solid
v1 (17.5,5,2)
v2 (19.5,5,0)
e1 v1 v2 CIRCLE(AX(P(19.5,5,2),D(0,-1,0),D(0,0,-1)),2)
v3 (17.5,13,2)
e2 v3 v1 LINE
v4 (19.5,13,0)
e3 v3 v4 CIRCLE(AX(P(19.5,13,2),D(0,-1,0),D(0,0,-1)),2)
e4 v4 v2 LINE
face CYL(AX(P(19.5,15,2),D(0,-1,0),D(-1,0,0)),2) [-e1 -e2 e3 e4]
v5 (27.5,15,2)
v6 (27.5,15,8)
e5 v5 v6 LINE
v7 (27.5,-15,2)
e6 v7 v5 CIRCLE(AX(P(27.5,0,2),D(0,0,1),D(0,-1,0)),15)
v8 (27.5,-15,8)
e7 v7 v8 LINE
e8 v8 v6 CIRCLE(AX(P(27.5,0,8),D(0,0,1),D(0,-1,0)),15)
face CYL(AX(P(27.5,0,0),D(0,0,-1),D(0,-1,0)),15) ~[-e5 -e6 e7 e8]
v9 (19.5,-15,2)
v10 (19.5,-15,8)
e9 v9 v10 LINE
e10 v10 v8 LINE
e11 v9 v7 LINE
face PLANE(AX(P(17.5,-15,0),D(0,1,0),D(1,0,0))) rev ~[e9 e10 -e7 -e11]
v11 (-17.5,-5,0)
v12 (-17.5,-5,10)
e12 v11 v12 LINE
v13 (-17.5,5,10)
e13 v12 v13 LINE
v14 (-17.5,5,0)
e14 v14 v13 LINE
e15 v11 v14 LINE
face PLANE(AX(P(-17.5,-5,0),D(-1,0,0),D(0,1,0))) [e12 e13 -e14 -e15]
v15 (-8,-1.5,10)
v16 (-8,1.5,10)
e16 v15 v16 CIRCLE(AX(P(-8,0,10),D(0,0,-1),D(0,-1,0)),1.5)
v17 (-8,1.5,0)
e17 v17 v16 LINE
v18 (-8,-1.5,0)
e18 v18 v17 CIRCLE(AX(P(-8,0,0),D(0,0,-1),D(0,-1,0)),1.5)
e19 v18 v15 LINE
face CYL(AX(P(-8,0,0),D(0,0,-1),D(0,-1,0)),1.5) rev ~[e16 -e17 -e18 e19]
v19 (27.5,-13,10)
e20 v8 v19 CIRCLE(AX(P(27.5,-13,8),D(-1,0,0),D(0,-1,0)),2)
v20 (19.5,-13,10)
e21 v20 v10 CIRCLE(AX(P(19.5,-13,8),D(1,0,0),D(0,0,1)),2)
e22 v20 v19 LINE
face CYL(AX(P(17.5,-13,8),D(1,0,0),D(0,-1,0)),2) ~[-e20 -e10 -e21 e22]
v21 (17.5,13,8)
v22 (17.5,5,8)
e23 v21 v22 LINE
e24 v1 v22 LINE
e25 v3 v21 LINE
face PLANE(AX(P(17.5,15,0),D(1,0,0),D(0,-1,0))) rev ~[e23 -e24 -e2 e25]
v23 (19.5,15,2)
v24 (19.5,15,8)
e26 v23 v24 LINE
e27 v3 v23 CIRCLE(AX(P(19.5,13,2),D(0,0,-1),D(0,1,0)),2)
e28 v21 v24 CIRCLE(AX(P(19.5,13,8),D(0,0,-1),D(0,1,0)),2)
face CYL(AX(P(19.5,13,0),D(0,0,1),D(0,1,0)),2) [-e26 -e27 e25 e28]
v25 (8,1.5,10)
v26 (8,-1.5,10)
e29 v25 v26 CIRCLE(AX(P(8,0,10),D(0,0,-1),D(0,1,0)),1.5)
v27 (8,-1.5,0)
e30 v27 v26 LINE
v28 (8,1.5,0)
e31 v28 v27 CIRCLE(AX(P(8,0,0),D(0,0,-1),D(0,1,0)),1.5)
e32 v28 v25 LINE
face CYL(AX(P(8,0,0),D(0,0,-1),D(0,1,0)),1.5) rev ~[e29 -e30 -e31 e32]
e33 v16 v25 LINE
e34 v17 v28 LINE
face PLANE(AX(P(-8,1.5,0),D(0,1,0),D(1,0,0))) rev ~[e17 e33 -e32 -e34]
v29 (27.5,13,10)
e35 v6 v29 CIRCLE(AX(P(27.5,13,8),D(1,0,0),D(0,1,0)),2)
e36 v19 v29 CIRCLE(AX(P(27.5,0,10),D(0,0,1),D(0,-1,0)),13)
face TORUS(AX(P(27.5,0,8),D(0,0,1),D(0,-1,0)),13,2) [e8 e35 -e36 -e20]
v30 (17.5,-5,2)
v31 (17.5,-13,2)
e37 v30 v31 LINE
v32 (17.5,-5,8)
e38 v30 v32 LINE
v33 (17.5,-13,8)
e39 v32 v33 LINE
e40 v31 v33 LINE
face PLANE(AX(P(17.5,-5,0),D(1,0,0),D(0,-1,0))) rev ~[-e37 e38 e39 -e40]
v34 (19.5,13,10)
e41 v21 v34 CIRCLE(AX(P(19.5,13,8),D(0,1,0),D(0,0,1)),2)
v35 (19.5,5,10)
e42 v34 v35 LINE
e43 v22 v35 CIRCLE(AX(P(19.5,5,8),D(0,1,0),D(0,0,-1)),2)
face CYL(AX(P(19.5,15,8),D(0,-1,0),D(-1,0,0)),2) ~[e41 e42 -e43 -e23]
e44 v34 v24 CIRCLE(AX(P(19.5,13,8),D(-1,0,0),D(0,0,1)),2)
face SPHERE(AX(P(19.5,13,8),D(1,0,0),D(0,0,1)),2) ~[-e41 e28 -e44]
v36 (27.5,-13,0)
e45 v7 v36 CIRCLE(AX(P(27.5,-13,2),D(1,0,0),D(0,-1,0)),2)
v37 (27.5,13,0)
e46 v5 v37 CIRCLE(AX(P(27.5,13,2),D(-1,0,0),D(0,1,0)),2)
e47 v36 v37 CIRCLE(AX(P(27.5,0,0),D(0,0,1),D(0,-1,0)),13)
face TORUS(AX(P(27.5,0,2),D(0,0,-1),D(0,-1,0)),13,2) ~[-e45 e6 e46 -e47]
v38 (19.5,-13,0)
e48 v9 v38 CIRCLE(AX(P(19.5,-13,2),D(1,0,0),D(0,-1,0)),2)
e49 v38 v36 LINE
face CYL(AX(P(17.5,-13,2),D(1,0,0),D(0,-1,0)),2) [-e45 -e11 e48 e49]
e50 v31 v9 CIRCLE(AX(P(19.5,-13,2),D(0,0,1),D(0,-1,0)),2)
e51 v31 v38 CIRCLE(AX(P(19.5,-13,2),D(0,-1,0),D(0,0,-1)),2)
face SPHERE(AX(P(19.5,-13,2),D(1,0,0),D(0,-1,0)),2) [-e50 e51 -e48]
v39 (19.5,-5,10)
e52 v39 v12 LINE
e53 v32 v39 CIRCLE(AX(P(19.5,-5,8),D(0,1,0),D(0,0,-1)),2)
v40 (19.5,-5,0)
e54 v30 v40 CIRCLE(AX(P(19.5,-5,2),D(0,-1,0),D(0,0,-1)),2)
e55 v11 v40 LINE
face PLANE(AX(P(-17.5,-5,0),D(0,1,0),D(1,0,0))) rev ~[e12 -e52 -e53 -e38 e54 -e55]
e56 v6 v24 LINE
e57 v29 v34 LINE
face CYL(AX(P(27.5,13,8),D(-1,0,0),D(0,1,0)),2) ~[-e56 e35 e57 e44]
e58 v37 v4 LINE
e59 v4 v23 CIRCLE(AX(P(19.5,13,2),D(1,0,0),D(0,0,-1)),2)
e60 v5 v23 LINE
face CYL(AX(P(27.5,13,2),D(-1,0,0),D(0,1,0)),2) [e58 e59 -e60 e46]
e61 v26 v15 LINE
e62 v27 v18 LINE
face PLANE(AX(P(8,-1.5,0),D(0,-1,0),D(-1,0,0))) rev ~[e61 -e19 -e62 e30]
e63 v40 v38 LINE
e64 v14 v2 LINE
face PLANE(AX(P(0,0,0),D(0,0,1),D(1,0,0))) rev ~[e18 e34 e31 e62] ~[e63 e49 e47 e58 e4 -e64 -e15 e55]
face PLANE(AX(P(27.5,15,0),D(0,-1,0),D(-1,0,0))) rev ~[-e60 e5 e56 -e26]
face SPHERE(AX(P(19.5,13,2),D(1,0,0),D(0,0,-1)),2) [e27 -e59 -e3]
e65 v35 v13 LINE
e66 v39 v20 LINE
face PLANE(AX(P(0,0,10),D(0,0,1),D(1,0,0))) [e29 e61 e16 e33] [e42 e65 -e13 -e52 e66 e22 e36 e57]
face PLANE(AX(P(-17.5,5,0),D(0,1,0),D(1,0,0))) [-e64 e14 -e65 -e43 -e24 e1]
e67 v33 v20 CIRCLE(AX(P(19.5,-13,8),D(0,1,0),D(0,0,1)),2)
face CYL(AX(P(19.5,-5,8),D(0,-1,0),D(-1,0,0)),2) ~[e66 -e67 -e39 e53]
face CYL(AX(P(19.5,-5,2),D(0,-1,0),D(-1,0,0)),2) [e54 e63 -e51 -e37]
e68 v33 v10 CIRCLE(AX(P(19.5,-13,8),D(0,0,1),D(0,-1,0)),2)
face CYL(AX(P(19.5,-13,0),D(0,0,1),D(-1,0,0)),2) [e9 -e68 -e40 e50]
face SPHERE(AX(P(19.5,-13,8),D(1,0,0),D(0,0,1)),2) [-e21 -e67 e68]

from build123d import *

# Parameters (mm, degrees)
F0_W     = 35
F0_H     = 10
F1_DEPTH = 10
F2_R     = 2


# Not quite as in the source:
# - a feature names something its author has since deleted; it is built from what else it names


with BuildPart() as f1:
    # F0 (on Top) → F1 (new body)
    with BuildSketch(Plane.XY):
        Rectangle(F0_W, F0_H)
        with BuildLine():
            Line((-8, 1.5), (0, 1.5))
            Line((0, 1.5), (8, 1.5))
            ThreePointArc((8, 1.5), (9.5, 0), (8, -1.5))
            Line((8, -1.5), (0, -1.5))
            Line((0, -1.5), (-8, -1.5))
            ThreePointArc((-8, -1.5), (-9.5, 0), (-8, 1.5))
        make_face(mode=Mode.SUBTRACT)
        Polygon((17.5, 15), (17.5, 5), (17.5, -5), (17.5, -15), (27.5, -15), (27.5, 15), align=None)
        with BuildLine():
            ThreePointArc((27.5, -15), (42.5, 0), (27.5, 15))
            Line((27.5, 15), (27.5, -15))
        make_face()
    extrude(amount=F1_DEPTH)

    # F2
    f2_edges = [f1.edges().sort_by_distance(p)[0] for p in [
        (27.5, 15, 5),
        (27.5, -15, 5),
        (42.5, 0, 10),
        (42.5, 0, 0),
        (17.5, 10, 10),
        (17.5, -10, 10),
        (17.5, -15, 5),
        (17.5, 10, 0),
        (17.5, -10, 0),
        (17.5, 15, 5),
    ]]
    fillet(f2_edges, radius=F2_R)


solid = f1.part
